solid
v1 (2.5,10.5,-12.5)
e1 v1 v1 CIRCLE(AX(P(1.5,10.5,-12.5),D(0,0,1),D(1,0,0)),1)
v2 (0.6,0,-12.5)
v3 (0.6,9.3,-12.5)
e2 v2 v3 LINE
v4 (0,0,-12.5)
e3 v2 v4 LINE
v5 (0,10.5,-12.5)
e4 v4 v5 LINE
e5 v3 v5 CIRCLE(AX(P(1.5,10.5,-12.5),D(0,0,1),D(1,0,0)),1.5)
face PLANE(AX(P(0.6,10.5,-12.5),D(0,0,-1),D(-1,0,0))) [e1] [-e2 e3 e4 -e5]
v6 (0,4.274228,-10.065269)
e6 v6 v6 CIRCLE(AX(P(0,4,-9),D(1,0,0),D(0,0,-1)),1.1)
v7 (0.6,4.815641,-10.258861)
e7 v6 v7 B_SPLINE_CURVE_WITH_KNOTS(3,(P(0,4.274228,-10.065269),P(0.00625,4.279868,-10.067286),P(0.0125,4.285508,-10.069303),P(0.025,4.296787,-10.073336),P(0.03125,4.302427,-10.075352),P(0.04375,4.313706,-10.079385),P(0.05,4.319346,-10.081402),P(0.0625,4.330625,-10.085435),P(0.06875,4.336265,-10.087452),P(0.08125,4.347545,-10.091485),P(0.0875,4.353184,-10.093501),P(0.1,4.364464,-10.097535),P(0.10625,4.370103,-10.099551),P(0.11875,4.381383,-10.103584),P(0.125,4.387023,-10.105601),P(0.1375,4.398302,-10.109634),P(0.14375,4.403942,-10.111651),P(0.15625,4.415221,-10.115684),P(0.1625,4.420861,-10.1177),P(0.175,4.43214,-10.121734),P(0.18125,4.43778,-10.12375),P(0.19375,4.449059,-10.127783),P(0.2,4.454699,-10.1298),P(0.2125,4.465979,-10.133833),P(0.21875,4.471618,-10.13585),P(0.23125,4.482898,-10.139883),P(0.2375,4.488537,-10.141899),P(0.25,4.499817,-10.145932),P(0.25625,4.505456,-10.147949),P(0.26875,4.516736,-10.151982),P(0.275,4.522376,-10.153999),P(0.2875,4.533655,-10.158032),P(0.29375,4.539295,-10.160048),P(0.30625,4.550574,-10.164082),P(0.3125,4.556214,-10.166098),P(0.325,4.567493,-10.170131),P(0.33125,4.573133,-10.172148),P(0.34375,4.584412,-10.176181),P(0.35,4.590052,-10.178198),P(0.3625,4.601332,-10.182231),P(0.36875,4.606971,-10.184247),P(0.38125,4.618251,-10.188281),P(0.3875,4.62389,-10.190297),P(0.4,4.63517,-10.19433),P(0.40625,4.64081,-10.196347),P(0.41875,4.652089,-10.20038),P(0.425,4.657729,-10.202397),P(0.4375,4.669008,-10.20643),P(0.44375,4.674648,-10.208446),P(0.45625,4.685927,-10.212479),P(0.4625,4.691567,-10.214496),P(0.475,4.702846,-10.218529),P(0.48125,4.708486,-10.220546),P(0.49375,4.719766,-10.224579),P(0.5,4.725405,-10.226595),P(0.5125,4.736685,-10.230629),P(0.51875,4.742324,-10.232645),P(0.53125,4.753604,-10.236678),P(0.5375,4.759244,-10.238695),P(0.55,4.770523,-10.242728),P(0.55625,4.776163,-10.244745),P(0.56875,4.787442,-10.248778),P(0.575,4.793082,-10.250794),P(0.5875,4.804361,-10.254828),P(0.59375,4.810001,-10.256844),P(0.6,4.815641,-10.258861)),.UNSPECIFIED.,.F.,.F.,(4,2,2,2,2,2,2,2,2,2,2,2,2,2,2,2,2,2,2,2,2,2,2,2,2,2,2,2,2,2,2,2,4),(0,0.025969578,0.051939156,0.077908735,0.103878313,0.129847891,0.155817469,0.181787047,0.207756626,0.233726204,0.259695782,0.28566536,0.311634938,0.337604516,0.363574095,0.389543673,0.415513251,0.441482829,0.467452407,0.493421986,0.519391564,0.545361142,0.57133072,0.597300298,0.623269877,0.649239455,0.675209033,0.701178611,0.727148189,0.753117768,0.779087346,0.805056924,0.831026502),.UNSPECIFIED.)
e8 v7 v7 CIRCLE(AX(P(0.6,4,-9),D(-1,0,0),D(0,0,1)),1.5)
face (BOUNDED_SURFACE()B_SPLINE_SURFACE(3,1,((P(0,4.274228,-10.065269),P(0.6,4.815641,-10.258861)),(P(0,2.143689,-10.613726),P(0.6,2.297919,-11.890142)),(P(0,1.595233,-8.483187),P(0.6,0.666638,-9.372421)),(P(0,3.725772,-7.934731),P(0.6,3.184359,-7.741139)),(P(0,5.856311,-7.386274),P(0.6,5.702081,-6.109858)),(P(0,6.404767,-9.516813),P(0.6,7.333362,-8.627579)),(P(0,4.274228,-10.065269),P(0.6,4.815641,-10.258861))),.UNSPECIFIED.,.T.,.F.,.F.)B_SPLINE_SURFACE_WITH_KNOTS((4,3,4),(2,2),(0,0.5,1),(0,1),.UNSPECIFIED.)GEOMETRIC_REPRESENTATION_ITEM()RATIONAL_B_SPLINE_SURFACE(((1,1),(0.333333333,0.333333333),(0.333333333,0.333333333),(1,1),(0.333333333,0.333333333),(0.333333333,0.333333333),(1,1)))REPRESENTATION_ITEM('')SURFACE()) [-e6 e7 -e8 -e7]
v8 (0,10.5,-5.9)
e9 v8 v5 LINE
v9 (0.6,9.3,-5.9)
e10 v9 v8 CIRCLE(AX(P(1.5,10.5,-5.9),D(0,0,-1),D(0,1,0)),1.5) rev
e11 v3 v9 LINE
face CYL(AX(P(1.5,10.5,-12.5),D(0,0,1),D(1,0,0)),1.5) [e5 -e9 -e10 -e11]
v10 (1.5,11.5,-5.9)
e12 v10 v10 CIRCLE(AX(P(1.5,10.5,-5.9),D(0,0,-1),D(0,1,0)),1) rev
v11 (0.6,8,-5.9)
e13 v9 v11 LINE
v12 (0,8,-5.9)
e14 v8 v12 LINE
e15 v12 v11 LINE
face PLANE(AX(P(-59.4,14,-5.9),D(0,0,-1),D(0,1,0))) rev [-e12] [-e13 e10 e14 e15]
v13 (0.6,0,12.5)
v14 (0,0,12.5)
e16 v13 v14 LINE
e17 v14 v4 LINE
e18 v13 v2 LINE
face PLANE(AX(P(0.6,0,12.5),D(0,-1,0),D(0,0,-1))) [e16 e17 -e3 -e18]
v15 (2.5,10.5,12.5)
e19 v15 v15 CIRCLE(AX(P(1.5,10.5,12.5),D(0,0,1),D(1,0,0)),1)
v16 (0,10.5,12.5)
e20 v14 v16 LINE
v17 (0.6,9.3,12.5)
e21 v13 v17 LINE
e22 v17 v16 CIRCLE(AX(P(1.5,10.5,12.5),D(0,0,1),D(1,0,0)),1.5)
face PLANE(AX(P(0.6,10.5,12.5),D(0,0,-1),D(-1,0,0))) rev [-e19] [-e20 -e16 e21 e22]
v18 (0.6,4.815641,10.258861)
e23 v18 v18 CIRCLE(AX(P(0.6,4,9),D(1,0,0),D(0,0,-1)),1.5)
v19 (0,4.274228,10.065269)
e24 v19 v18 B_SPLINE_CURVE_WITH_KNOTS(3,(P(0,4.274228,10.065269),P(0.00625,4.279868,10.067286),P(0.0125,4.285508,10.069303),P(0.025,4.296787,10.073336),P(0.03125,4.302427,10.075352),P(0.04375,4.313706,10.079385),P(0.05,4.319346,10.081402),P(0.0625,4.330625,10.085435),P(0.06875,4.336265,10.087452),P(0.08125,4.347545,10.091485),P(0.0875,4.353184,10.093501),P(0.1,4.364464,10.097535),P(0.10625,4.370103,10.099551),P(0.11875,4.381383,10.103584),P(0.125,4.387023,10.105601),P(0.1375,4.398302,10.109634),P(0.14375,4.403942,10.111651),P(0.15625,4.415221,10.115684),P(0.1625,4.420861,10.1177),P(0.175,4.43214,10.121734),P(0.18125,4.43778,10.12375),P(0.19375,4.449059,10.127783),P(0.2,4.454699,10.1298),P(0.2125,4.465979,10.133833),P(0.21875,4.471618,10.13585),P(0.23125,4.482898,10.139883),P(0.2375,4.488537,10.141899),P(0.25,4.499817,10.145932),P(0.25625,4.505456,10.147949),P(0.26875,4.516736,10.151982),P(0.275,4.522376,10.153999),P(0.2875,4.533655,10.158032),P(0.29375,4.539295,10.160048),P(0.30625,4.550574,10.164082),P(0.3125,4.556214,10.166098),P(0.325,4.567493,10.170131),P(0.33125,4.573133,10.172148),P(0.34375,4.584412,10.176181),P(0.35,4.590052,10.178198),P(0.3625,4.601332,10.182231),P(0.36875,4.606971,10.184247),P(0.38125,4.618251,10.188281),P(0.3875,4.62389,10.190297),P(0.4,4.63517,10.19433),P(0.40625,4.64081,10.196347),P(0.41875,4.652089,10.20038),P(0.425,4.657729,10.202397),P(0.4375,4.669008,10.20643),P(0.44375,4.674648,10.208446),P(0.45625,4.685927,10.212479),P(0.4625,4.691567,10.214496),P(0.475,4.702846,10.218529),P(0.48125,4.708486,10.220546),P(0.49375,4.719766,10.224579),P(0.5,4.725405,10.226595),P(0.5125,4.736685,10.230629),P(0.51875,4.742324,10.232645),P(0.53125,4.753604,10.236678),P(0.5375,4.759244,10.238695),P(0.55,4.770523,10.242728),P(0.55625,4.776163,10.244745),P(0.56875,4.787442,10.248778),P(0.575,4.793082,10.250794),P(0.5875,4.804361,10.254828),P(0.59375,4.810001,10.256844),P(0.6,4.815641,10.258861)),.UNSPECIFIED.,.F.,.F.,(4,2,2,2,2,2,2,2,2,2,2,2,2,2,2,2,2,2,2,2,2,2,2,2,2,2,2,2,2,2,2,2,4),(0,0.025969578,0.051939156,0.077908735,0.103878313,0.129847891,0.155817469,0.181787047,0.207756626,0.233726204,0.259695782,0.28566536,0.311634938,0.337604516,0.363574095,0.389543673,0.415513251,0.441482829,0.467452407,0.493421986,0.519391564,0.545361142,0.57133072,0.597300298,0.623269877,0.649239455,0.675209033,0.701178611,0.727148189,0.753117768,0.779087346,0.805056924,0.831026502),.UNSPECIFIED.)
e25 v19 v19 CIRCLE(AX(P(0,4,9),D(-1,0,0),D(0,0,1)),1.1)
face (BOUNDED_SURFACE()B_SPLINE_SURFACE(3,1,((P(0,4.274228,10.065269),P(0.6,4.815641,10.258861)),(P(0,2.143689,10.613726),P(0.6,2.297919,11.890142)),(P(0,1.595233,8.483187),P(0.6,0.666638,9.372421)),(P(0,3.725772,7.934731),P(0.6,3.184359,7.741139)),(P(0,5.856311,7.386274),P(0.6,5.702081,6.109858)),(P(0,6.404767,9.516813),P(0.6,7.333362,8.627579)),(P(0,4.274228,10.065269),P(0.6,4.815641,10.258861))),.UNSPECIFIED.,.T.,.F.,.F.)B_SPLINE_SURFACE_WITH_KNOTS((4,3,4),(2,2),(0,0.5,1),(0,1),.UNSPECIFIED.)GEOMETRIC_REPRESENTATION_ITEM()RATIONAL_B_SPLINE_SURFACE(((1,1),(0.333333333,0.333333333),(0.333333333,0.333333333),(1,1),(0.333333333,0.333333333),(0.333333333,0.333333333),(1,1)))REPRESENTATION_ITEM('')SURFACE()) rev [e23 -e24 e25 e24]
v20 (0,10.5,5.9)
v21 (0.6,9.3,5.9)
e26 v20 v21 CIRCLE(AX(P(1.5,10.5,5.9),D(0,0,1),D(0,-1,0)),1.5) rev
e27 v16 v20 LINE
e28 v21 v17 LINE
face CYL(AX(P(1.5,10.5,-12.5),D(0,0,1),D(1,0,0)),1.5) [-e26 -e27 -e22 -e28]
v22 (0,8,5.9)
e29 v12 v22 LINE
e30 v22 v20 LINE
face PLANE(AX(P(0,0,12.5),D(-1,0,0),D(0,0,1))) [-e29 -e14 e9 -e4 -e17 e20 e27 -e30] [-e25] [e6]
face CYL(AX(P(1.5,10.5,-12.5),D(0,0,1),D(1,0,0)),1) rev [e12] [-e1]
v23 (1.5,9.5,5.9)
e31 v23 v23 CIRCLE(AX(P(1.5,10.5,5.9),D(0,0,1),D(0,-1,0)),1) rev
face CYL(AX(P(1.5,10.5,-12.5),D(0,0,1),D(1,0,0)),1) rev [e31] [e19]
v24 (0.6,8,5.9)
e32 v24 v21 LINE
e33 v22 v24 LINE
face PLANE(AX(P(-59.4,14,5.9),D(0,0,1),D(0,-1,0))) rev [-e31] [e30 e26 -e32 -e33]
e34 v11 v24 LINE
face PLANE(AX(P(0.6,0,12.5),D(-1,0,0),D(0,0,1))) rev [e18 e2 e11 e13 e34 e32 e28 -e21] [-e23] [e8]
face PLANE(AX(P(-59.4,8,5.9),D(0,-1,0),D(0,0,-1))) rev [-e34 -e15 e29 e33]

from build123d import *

# Parameters (mm, degrees)
SKETCH_1_W          = 0.6
SKETCH_1_H          = 10.5
EXTRUDE_1_DEPTH     = 12.5
SKETCH_2_R          = 1.5
SKETCH_3_R          = 1
CUT_EXTRUDE_1_DEPTH = 28.892651362
SKETCH_10_W         = 11.8
SKETCH_10_H         = 6
CUT_EXTRUDE_4_DEPTH = 60


with BuildPart() as part:
    # 草图1 → 拉伸-薄壁1 (new, symmetric)
    with BuildSketch(Plane.XY):
        with Locations((0.3, 5.25)):
            Rectangle(SKETCH_1_W, SKETCH_1_H)
    extrude(amount=EXTRUDE_1_DEPTH, both=True)

    # 扫描1: sweep along a curve in space
    with BuildLine() as sweep_1_path:
        Line((0.6, 10.5, 12.5), (0.6, 10.5, -12.5))
    # 草图2 → 扫描1 (sweep)
    with BuildSketch(Plane.XY.offset(12.5)):
        with Locations((1.5, 10.5)):
            Circle(SKETCH_2_R)
    sweep(path=sweep_1_path.line)

    # 草图3 → 切除-拉伸1 (cut, through all)
    with BuildSketch(Plane.XY.offset(12.5)):
        with Locations((1.5, 10.5)):
            Circle(SKETCH_3_R)
    extrude(amount=-CUT_EXTRUDE_1_DEPTH, mode=Mode.SUBTRACT)

    # 草图10 → 切除-拉伸4 (cut, symmetric)
    with BuildSketch(Plane(origin=(0.6, 0, 0), x_dir=(0, 0, -1), z_dir=(1, 0, 0))):
        with Locations((0, 11)):
            Rectangle(SKETCH_10_W, SKETCH_10_H)
    extrude(amount=CUT_EXTRUDE_4_DEPTH, both=True, mode=Mode.SUBTRACT)

    # 切除-放样1: read off the stored shape, not the designer's step
    # 切除-放样1: loft between two sections, ruled curve by curve
    loft_1_from = [
        Edge.make_bspline([(0, 4.274228258, 10.065269385), (0, 2.143689489, 10.613725902), (0, 1.595232972, 8.483187132), (0, 3.725771742, 7.934730615), (0, 5.856310511, 7.386274098), (0, 6.404767028, 9.516812868), (0, 4.274228258, 10.065269385)], [0, 0, 0, 0, 0.5, 0.5, 0.5, 1, 1, 1, 1], 3, [1, 0.333333333, 0.333333333, 1, 0.333333333, 0.333333333, 1]),
    ]
    loft_1_to = [
        Edge.make_bspline([(0.6, 4.815640724, 10.258860679), (0.6, 2.297919366, 11.890142127), (0.6, 0.666637918, 9.372420769), (0.6, 3.184359276, 7.741139321), (0.6, 5.702080634, 6.109857873), (0.6, 7.333362082, 8.627579231), (0.6, 4.815640724, 10.258860679)], [0, 0, 0, 0, 0.5, 0.5, 0.5, 1, 1, 1, 1], 3, [1, 0.333333333, 0.333333333, 1, 0.333333333, 0.333333333, 1]),
    ]
    loft_1 = Solid(Shell([*[Face.make_surface_from_curves(loft_1_from[k], loft_1_to[k]) for k in range(1)], Face(Wire(loft_1_from)), Face(Wire(loft_1_to))]))
    add(loft_1, mode=Mode.SUBTRACT)

    # 镜向1: 切除-放样1 across plane
    add(loft_1.mirror(Plane.XY), mode=Mode.SUBTRACT)


solid = part.part
